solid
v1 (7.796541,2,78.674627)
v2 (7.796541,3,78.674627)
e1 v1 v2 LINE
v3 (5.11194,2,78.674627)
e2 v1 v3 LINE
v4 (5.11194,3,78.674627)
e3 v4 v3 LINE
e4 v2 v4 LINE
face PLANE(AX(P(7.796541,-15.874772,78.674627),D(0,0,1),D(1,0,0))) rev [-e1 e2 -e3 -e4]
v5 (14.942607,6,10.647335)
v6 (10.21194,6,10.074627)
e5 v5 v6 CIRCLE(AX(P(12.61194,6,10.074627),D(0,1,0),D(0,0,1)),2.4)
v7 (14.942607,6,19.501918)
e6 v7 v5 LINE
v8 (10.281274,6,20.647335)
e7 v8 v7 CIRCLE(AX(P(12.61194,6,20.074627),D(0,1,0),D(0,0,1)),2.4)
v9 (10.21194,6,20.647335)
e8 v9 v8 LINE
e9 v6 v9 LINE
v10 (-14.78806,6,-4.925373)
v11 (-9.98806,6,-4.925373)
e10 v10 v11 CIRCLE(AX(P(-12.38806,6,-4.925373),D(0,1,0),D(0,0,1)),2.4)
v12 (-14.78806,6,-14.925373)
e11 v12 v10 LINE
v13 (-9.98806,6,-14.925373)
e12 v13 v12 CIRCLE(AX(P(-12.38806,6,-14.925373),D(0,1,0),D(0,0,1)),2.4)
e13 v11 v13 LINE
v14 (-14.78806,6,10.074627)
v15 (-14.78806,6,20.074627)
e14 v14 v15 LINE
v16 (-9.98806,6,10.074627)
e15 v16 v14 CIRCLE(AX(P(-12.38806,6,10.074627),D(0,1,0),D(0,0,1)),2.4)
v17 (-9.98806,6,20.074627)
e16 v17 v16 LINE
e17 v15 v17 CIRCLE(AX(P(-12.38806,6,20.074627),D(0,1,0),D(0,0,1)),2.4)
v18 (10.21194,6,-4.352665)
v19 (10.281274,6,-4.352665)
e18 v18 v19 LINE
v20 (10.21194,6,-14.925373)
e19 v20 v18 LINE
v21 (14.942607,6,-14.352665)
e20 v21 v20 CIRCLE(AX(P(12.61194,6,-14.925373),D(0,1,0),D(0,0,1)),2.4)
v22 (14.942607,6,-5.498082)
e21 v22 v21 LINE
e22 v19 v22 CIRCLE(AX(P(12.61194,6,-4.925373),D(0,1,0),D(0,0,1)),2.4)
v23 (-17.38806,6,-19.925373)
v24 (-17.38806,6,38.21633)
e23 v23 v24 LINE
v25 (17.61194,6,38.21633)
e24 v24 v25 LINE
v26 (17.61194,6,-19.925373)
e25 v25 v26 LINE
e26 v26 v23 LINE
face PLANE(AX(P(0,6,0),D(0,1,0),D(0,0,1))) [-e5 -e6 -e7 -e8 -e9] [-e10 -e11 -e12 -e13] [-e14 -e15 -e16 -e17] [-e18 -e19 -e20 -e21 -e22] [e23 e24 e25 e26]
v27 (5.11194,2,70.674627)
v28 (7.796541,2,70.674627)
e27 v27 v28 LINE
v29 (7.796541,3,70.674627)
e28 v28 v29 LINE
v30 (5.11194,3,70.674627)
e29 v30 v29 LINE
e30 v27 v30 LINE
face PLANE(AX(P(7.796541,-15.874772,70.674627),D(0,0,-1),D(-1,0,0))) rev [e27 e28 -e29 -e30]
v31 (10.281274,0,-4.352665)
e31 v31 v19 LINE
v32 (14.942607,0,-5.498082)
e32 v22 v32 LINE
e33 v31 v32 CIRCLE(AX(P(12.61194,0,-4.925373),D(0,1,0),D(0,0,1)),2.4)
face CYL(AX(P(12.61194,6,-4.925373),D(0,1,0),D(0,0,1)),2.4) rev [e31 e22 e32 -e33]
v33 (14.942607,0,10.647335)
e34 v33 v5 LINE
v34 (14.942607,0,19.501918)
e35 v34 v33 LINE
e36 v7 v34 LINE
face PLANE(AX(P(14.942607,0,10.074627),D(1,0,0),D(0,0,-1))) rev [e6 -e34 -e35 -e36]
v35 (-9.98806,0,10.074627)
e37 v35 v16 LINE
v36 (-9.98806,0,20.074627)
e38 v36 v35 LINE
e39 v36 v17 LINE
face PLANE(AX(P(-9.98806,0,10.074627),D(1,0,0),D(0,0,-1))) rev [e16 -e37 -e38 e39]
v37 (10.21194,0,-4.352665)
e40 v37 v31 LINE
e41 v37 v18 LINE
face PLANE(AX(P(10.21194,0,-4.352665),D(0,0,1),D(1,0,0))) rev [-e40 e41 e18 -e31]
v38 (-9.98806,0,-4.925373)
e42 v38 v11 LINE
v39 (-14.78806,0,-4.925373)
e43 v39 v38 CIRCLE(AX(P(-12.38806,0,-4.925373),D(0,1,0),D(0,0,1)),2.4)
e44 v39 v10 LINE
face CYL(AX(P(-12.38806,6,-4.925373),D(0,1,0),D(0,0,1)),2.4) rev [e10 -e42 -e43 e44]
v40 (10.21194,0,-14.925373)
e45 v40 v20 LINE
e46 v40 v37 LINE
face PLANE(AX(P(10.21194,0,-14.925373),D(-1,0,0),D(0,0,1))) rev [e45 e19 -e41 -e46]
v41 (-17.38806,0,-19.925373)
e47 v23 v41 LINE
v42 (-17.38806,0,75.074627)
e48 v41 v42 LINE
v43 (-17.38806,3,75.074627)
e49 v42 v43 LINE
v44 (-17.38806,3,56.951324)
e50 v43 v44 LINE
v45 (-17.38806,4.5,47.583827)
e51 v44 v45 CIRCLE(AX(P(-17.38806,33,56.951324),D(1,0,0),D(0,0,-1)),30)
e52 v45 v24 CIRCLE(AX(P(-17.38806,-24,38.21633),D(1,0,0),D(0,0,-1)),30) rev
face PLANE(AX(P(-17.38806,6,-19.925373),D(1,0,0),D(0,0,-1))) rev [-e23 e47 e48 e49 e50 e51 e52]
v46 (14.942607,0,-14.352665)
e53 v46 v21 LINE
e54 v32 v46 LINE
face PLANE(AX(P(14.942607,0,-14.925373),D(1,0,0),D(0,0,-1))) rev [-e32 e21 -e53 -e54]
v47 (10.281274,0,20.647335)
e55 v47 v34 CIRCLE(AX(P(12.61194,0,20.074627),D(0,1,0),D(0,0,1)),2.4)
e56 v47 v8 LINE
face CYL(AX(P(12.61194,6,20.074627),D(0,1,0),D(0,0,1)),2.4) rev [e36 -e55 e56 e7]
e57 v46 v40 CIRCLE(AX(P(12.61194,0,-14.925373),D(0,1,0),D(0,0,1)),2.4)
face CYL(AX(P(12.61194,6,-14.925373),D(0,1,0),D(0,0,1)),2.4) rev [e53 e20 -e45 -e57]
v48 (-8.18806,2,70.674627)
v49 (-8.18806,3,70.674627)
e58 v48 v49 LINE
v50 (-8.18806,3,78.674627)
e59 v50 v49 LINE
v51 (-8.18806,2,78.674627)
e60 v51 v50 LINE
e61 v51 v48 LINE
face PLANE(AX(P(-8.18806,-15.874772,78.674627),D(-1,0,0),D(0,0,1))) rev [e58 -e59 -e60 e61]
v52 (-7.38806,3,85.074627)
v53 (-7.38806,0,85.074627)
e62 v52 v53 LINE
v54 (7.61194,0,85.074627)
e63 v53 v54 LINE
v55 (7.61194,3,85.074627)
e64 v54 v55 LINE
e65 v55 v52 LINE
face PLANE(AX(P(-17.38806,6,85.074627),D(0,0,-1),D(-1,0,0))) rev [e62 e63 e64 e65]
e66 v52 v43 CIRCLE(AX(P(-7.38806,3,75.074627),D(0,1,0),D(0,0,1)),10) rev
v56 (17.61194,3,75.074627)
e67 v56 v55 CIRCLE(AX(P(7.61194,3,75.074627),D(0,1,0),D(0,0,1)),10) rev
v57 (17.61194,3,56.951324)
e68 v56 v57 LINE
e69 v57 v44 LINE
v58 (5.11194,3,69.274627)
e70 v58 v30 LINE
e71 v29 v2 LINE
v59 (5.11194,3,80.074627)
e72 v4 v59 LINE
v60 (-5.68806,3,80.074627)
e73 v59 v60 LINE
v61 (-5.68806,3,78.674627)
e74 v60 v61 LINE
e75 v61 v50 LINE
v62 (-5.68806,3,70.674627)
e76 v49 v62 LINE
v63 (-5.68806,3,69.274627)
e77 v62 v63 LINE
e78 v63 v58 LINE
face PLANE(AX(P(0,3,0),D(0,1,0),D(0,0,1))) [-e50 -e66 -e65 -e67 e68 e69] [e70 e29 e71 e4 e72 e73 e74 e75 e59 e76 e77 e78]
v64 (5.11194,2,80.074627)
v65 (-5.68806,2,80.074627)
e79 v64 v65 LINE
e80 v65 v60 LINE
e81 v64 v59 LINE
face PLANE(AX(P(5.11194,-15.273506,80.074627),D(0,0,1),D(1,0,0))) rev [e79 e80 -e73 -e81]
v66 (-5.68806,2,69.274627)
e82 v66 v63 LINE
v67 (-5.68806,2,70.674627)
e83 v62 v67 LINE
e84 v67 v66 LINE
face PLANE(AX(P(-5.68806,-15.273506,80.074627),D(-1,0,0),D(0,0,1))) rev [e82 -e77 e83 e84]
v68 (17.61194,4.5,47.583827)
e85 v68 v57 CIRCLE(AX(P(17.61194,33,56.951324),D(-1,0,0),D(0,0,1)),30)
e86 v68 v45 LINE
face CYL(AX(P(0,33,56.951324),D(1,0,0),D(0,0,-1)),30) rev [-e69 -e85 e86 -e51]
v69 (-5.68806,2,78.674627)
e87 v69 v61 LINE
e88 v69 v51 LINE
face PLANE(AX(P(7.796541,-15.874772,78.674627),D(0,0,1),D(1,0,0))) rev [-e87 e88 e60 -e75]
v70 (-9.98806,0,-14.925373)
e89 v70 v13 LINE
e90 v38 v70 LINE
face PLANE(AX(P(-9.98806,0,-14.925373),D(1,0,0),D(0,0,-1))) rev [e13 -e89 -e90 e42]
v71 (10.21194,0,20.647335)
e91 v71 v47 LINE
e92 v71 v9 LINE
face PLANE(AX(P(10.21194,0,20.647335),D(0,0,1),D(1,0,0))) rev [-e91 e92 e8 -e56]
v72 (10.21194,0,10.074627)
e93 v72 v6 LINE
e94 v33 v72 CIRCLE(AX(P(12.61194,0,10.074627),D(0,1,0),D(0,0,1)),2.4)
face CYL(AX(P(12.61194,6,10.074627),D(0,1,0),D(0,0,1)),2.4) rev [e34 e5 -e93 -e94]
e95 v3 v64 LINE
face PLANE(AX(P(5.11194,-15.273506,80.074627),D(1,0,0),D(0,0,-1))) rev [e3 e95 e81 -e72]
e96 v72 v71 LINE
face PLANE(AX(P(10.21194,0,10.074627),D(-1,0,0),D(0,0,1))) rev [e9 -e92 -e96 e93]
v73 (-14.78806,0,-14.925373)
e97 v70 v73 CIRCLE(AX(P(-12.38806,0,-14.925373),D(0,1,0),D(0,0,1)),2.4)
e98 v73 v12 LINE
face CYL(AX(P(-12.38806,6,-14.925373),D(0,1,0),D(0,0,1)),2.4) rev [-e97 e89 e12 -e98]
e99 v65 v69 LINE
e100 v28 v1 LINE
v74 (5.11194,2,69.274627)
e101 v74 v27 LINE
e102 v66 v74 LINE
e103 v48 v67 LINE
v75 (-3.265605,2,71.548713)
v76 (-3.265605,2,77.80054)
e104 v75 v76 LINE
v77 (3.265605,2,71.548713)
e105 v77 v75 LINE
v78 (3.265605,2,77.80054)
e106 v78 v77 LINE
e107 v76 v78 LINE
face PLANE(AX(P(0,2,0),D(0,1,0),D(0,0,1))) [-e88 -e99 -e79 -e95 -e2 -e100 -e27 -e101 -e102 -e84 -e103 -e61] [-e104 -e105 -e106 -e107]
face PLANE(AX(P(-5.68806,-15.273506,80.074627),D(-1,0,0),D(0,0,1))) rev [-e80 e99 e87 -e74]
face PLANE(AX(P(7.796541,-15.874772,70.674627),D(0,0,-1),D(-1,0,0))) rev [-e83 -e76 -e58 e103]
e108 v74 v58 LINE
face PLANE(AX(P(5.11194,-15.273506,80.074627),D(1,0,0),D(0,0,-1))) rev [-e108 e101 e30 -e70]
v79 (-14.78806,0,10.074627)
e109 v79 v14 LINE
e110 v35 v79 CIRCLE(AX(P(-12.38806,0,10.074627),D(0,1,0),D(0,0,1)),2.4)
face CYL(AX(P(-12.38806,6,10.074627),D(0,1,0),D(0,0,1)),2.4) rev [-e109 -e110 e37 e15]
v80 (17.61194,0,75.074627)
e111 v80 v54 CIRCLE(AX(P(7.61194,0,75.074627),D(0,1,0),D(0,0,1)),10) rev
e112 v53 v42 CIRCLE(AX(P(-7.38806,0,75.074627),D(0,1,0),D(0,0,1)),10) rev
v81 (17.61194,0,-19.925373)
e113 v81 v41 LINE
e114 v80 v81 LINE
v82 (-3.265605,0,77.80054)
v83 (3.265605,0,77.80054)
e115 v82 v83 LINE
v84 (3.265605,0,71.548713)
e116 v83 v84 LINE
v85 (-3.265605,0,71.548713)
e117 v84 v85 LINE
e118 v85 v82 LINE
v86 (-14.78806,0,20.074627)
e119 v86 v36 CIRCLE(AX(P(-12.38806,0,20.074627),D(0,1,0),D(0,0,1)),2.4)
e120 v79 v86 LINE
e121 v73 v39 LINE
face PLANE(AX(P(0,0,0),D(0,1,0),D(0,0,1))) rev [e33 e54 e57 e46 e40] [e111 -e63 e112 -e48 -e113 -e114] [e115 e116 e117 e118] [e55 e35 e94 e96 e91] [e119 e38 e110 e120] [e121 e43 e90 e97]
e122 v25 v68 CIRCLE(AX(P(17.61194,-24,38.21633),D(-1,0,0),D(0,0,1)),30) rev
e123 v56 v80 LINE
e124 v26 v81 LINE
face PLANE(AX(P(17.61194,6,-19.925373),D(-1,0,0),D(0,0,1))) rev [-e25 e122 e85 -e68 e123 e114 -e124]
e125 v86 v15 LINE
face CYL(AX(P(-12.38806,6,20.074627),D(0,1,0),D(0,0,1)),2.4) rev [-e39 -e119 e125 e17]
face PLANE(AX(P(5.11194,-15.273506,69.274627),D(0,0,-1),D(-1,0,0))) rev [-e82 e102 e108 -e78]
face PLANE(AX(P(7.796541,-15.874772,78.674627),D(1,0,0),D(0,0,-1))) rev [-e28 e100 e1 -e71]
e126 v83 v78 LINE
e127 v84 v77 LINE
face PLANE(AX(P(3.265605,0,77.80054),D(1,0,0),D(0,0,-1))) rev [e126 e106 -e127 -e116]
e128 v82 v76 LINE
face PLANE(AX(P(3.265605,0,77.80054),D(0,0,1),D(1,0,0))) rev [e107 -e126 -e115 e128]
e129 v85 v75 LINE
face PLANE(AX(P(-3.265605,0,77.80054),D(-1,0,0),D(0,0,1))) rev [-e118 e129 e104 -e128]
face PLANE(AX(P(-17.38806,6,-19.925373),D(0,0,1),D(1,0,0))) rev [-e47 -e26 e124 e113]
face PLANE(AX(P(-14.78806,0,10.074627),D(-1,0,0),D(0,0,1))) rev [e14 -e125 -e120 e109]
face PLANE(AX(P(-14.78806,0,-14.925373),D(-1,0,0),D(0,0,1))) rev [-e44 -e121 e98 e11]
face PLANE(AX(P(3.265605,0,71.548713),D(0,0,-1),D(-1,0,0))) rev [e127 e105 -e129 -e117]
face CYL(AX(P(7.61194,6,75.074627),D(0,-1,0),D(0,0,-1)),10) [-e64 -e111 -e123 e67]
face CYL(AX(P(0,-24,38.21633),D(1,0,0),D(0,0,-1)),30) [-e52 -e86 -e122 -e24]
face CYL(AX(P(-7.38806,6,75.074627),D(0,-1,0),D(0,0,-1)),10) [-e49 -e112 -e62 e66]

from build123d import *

# Parameters (mm, degrees)
SKETCH1_W            = 35
SKETCH1_H            = 105
BOSS_EXTRUDE1_DEPTH  = 6
M4_CLEARANCE_HOLE1_D = 4.8
LPATTERN2_COUNT      = 2
LPATTERN2_PITCH      = 10
SKETCH5_W            = 4.8
SKETCH5_H            = 10
SKETCH5_W_2          = 4.730666207
SKETCH5_H_2          = 10.572708501
CUT_EXTRUDE1_DEPTH   = 88.085432636
SKETCH6_W            = 10.8
SKETCH6_H            = 10.8
CUT_EXTRUDE2_DEPTH   = 4
SKETCH7_W            = 6.531210434
SKETCH7_H            = 6.251826861
CUT_EXTRUDE3_DEPTH   = 87.970527062
SKETCH8_W            = 15.98460087
SKETCH8_H            = 8
CUT_EXTRUDE4_DEPTH   = 4
FILLET1_R            = 10
CUT_EXTRUDE5_START   = -6
SKETCH9_W            = 37.049954943
SKETCH9_H            = 41.2
CUT_EXTRUDE5_DEPTH   = 3
FILLET2_R            = 30
FILLET3_R            = 30


with BuildPart() as part:
    # Sketch1 → Boss-Extrude1 (new body)
    with BuildSketch(Plane(origin=(0, 0, 0), x_dir=(1, 0, 0), z_dir=(0, 1, 0))):
        with Locations((0.111940299, -32.574626866)):
            Rectangle(SKETCH1_W, SKETCH1_H)
    extrude(amount=BOSS_EXTRUDE1_DEPTH)

    # M4 Clearance Hole1 (through all)
    with Locations(Plane(origin=(0, 6, 0), x_dir=(1, 0, 0), z_dir=(0, 1, 0))):
        with Locations((-12.388059701, 14.925373134), (12.611940299, 14.925373134), (12.611940299, -10.074626866), (-12.388059701, -10.074626866)):
            m4_clearance_hole1 = Hole(M4_CLEARANCE_HOLE1_D / 2)

    # LPattern2: M4 Clearance Hole1 ×2
    with Locations(*[(0, 0, i * LPATTERN2_PITCH) for i in range(1, LPATTERN2_COUNT)]):
        add(m4_clearance_hole1, mode=Mode.SUBTRACT)

    # Sketch5 → Cut-Extrude1 (cut, through all)
    with BuildSketch(Plane(origin=(0, 6, 0), x_dir=(1, 0, 0), z_dir=(0, 1, 0))):
        with Locations((-12.388059701, 9.925373134)):
            Rectangle(SKETCH5_W, SKETCH5_H)
        with Locations((-12.388059701, -15.074626866)):
            Rectangle(SKETCH5_W, SKETCH5_H)
        with Locations((12.577273403, 9.639018884)):
            Rectangle(SKETCH5_W_2, SKETCH5_H_2)
        with Locations((12.577273403, -15.360981116)):
            Rectangle(SKETCH5_W_2, SKETCH5_H_2)
    extrude(amount=-CUT_EXTRUDE1_DEPTH, mode=Mode.SUBTRACT)

    # Sketch6 → Cut-Extrude2 (cut)
    with BuildSketch(Plane(origin=(0, 6, 0), x_dir=(1, 0, 0), z_dir=(0, 1, 0))):
        with Locations((-0.288059701, -74.674626866)):
            Rectangle(SKETCH6_W, SKETCH6_H)
    extrude(amount=-CUT_EXTRUDE2_DEPTH, mode=Mode.SUBTRACT)

    # Sketch7 → Cut-Extrude3 (cut, through all)
    with BuildSketch(Plane(origin=(0, 2, 0), x_dir=(1, 0, 0), z_dir=(0, 1, 0))):
        with Locations((0, -74.674626866)):
            Rectangle(SKETCH7_W, SKETCH7_H)
    extrude(amount=-CUT_EXTRUDE3_DEPTH, mode=Mode.SUBTRACT)

    # Sketch8 → Cut-Extrude4 (cut)
    with BuildSketch(Plane(origin=(0, 6, 0), x_dir=(1, 0, 0), z_dir=(0, 1, 0))):
        with Locations((-0.195759266, -74.674626866)):
            Rectangle(SKETCH8_W, SKETCH8_H)
    extrude(amount=-CUT_EXTRUDE4_DEPTH, mode=Mode.SUBTRACT)

    # Fillet1
    fillet1_edges = [part.edges().sort_by_distance(p)[0] for p in [
        (17.611940299, 3, 85.074626866),
        (-17.388059701, 3, 85.074626866),
    ]]
    fillet(fillet1_edges, radius=FILLET1_R)

    # Sketch9 → Cut-Extrude5 (cut)
    with BuildSketch(Plane.XZ.offset(CUT_EXTRUDE5_START)):
        with Locations((1.136917771, 64.474626866)):
            Rectangle(SKETCH9_W, SKETCH9_H)
    extrude(amount=CUT_EXTRUDE5_DEPTH, mode=Mode.SUBTRACT)

    # Fillet2
    # the kernel refuses this fillet: 30 mm, written as the material it adds along each edge
    with BuildSketch(Plane(origin=(-17.388059701, 3, 43.874626866), x_dir=(0, 1, 0), z_dir=(1, 0, 0))) as fillet2_piece_1:
        with BuildLine():
            CenterArc((30, 13.076696831), FILLET2_R, 180, 25.841932763)
            Line((0, 13.076696831), (-0.6, 13.076696831))
            Line((-0.6, 13.076696831), (-0.6, 0))
            Line((-0.6, 0), (0, -0.6))
            ThreePointArc((0, -0.6), (1.5, -0.6), (2.46, -0.261533937))
            Line((2.46, -0.261533937), (3, 0))
        make_face()
    extrude(amount=35)

    # Fillet3
    fillet3_edges = [part.edges().sort_by_distance(p)[0] for p in [
        (0.111940299, 6, 43.874626866),
    ]]
    fillet(fillet3_edges, radius=FILLET3_R)


solid = part.part
